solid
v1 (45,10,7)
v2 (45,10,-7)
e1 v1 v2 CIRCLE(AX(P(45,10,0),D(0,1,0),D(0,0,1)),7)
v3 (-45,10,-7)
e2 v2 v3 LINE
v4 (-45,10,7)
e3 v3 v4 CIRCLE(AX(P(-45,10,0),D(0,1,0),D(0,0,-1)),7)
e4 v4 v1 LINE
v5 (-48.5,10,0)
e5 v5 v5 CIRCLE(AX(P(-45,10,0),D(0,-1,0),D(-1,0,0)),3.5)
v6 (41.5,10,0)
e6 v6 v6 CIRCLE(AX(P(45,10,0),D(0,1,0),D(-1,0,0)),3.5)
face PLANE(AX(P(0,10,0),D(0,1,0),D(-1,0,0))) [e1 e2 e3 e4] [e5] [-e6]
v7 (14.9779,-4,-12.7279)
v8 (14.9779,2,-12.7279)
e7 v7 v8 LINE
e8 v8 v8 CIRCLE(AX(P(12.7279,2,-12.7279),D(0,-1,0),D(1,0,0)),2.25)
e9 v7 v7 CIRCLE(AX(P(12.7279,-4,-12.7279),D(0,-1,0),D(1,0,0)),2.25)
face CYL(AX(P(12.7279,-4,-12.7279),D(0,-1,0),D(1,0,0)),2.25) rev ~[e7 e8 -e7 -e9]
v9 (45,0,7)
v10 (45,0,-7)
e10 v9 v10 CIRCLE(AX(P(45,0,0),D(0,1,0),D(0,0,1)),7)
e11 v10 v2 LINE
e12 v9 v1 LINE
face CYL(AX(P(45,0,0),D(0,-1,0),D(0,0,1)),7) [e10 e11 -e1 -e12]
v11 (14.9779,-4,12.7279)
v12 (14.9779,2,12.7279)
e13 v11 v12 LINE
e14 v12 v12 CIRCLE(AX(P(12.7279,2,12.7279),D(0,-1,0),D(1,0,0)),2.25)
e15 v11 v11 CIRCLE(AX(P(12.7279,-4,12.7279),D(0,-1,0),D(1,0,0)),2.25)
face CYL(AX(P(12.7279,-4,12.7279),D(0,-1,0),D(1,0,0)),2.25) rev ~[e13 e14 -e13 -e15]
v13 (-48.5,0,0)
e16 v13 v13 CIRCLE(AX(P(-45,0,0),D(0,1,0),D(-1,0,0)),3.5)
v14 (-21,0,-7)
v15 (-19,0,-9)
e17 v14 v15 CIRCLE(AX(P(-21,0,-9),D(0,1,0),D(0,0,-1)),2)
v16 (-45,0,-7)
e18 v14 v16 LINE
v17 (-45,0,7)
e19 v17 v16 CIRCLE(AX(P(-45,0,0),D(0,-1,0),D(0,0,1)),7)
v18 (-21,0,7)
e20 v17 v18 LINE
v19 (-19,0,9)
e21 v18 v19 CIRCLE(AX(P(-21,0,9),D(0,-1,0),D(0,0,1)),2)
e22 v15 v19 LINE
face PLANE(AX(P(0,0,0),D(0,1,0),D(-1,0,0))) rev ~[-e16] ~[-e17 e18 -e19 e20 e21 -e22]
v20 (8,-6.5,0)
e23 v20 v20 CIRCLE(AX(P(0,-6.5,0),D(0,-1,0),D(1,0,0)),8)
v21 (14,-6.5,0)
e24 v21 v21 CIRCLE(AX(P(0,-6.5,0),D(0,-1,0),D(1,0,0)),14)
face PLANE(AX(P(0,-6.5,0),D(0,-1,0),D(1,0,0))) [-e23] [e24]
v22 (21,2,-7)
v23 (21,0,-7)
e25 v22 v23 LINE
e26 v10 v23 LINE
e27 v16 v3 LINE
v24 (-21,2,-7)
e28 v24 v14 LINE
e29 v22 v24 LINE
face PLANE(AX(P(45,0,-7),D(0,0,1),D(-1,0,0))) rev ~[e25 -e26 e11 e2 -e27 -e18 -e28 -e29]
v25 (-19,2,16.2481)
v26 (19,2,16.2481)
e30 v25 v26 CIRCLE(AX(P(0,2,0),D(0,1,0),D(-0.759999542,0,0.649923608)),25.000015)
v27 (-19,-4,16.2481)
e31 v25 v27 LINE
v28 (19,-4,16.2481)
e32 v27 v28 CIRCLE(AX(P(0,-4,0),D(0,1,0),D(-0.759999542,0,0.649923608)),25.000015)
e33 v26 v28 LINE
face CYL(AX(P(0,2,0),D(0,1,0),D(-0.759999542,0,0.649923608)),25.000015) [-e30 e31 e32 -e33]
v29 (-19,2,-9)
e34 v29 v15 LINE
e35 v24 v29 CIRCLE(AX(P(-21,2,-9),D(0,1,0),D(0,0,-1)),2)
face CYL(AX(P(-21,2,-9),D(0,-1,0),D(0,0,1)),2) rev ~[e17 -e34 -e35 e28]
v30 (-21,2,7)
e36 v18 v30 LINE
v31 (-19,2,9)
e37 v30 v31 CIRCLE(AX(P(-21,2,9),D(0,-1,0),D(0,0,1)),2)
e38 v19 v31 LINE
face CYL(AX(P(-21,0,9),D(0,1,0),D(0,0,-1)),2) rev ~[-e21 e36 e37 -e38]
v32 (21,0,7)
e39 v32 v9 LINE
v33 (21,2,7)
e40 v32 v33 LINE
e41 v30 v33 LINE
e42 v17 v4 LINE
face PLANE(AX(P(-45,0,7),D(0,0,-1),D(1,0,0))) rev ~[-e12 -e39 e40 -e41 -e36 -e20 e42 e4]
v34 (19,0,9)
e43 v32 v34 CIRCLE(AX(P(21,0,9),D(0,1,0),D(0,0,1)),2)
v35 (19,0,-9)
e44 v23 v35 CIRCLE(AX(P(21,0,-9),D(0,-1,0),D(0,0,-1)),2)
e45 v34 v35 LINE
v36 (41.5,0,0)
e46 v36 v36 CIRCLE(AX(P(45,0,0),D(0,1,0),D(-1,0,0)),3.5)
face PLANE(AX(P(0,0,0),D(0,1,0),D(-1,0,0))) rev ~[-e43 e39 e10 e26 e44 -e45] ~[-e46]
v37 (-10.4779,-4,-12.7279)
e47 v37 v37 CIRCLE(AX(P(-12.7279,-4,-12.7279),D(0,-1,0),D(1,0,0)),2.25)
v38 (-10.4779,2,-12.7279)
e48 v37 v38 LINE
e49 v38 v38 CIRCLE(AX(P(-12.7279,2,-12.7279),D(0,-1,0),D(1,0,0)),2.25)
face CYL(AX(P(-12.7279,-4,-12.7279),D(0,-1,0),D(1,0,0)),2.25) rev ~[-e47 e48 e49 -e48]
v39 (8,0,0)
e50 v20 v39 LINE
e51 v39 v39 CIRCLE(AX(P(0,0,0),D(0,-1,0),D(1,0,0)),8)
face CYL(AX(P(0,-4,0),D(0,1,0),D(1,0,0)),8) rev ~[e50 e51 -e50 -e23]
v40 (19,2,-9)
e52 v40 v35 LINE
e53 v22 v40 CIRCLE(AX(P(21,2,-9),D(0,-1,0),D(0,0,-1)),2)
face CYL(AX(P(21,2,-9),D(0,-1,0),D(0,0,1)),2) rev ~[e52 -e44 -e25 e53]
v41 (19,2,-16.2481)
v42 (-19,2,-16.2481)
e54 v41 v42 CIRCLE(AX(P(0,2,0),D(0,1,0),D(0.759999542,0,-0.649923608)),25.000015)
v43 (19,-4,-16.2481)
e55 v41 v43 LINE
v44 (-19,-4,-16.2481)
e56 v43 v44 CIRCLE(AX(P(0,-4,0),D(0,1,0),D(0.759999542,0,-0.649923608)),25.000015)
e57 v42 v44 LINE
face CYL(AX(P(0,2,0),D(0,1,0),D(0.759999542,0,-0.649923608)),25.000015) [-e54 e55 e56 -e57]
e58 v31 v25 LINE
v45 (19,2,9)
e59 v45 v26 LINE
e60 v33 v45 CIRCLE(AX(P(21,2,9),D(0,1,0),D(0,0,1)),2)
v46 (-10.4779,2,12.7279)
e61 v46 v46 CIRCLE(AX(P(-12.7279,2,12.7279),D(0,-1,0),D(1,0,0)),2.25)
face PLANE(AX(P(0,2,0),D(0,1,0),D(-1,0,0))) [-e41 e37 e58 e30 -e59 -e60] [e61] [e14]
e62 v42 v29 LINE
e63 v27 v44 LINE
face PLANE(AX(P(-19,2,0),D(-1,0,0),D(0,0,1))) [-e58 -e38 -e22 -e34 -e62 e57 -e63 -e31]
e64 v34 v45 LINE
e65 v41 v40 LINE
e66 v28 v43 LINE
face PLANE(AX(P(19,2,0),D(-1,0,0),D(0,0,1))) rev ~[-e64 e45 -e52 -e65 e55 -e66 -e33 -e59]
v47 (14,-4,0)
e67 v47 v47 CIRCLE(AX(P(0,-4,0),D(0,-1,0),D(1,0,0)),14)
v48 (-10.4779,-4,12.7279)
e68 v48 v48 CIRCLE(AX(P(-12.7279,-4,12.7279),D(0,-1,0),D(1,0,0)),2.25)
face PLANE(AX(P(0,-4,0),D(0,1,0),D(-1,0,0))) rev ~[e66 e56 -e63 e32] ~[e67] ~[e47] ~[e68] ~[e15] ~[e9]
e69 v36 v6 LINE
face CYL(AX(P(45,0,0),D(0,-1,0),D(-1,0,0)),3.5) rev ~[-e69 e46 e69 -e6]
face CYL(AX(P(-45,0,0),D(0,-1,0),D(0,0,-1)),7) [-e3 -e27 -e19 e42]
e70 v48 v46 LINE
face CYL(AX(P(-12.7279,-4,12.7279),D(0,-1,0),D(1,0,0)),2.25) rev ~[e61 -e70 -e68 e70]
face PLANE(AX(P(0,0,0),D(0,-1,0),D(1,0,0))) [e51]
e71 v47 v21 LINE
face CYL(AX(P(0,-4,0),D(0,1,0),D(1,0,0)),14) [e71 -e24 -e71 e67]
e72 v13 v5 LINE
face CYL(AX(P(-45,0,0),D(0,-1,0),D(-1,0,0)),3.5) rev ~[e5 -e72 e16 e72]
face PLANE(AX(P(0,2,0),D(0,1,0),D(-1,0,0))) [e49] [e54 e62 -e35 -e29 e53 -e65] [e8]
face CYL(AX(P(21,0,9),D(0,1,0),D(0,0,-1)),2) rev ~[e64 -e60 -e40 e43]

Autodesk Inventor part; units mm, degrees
ref_plane "YZ Plane" through (0, 0, 0) normal (1, 0, 0) x (0, 1, 0)
ref_plane "XY Plane" through (0, 0, 0) normal (0, 0, 1) x (1, 0, 0)
sketch "Sketch1" plane through (0, 0, 0) normal (0, 1, 0) x (-1, 0, 0)
  line L0 (0, 0) -> (45, 0) construction
  line L1 (0, 0) -> (52, 0)
  line L2 (0, 0) -> (-45, 0)
  line L3 (-45, 0) -> (45, 0) construction
  line L4 (-45, -7) -> (45, -7)
  line L5 (45, 7) -> (-45, 7)
  arc A0 (-45, 7) -> (-45, -7) centre (-45, 0) ccw
  arc A1 (45, -7) -> (45, 7) centre (45, 0) ccw
  circle A2 centre (45, 0) radius 3.5
  circle A3 centre (-45, 0) radius 3.5
  dimension "d0" = 45
  dimension "d1" = 52
  dimension "d2" = 45
  dimension "d3" = 7
extrude "Extrusion1" add sketch "Sketch1" along normal blind 10
ref_plane "Work Plane1" through (0, 2, 0) normal (0, 1, 0) x (-1, 0, 0)
sketch "Sketch2" plane through (0, 2, 0) normal (0, 1, 0) x (-1, 0, 0)
  line L0 (0, 0) -> (19, 0)
  line L1 (19, 0) -> (19, -16.2481)
  line L2 (19, 0) -> (19, 16.2481)
  line L3 (0, 0) -> (-19, 0)
  line L4 (-19, 0) -> (-19, -16.2481)
  line L5 (-19, 0) -> (-19, 16.2481)
  arc A0 (-19, -16.2481) -> (19, -16.2481) centre (0, 0) ccw
  arc A1 (19, 16.2481) -> (-19, 16.2481) centre (0, 0) ccw
  dimension "d8" = 19
  dimension "d10" = 19
extrude "Extrusion2" add sketch "Sketch2" against normal blind 6
fillet "Fillet1" radius 2 4 edges at (-19, 1, -7) (-19, 1, 7) (19, 1, -7) (19, 1, 7)
sketch "Sketch3" plane through (0, -4, 0) normal (0, -1, 0) x (1, 0, 0)
  circle A0 centre (0, 0) radius 18 construction
  line L0 (0, 0) -> (12.7279, 12.7279) construction
  line L1 (0, 0) -> (18, 0) construction
  circle A1 centre (12.7279, 12.7279) radius 2.25
  circle A2 centre (-12.7279, 12.7279) radius 2.25
  circle A3 centre (-12.7279, -12.7279) radius 2.25
  circle A4 centre (12.7279, -12.7279) radius 2.25
  dimension "d14" = 36
  dimension "d15" = 45
  dimension "d16" = 4.5
  dimension "d19" = 360
extrude "Extrusion3" cut sketch "Sketch3" against normal blind 10
sketch "Sketch4" plane through (0, -4, 0) normal (0, -1, 0) x (1, 0, 0)
  circle A0 centre (0, 0) radius 14
  circle A1 centre (0, 0) radius 8
  dimension "d23" = 28
  dimension "d24" = 16
extrude "Extrusion4" add sketch "Sketch4" along normal blind 2.5
sketch "Sketch5" plane through (0, -4, 0) normal (0, -1, 0) x (1, 0, 0)
  circle A0 centre (0, 0) radius 8
extrude "Extrusion5" cut sketch "Sketch5" against normal blind 4
properties part number "Coperchio inferiore"
